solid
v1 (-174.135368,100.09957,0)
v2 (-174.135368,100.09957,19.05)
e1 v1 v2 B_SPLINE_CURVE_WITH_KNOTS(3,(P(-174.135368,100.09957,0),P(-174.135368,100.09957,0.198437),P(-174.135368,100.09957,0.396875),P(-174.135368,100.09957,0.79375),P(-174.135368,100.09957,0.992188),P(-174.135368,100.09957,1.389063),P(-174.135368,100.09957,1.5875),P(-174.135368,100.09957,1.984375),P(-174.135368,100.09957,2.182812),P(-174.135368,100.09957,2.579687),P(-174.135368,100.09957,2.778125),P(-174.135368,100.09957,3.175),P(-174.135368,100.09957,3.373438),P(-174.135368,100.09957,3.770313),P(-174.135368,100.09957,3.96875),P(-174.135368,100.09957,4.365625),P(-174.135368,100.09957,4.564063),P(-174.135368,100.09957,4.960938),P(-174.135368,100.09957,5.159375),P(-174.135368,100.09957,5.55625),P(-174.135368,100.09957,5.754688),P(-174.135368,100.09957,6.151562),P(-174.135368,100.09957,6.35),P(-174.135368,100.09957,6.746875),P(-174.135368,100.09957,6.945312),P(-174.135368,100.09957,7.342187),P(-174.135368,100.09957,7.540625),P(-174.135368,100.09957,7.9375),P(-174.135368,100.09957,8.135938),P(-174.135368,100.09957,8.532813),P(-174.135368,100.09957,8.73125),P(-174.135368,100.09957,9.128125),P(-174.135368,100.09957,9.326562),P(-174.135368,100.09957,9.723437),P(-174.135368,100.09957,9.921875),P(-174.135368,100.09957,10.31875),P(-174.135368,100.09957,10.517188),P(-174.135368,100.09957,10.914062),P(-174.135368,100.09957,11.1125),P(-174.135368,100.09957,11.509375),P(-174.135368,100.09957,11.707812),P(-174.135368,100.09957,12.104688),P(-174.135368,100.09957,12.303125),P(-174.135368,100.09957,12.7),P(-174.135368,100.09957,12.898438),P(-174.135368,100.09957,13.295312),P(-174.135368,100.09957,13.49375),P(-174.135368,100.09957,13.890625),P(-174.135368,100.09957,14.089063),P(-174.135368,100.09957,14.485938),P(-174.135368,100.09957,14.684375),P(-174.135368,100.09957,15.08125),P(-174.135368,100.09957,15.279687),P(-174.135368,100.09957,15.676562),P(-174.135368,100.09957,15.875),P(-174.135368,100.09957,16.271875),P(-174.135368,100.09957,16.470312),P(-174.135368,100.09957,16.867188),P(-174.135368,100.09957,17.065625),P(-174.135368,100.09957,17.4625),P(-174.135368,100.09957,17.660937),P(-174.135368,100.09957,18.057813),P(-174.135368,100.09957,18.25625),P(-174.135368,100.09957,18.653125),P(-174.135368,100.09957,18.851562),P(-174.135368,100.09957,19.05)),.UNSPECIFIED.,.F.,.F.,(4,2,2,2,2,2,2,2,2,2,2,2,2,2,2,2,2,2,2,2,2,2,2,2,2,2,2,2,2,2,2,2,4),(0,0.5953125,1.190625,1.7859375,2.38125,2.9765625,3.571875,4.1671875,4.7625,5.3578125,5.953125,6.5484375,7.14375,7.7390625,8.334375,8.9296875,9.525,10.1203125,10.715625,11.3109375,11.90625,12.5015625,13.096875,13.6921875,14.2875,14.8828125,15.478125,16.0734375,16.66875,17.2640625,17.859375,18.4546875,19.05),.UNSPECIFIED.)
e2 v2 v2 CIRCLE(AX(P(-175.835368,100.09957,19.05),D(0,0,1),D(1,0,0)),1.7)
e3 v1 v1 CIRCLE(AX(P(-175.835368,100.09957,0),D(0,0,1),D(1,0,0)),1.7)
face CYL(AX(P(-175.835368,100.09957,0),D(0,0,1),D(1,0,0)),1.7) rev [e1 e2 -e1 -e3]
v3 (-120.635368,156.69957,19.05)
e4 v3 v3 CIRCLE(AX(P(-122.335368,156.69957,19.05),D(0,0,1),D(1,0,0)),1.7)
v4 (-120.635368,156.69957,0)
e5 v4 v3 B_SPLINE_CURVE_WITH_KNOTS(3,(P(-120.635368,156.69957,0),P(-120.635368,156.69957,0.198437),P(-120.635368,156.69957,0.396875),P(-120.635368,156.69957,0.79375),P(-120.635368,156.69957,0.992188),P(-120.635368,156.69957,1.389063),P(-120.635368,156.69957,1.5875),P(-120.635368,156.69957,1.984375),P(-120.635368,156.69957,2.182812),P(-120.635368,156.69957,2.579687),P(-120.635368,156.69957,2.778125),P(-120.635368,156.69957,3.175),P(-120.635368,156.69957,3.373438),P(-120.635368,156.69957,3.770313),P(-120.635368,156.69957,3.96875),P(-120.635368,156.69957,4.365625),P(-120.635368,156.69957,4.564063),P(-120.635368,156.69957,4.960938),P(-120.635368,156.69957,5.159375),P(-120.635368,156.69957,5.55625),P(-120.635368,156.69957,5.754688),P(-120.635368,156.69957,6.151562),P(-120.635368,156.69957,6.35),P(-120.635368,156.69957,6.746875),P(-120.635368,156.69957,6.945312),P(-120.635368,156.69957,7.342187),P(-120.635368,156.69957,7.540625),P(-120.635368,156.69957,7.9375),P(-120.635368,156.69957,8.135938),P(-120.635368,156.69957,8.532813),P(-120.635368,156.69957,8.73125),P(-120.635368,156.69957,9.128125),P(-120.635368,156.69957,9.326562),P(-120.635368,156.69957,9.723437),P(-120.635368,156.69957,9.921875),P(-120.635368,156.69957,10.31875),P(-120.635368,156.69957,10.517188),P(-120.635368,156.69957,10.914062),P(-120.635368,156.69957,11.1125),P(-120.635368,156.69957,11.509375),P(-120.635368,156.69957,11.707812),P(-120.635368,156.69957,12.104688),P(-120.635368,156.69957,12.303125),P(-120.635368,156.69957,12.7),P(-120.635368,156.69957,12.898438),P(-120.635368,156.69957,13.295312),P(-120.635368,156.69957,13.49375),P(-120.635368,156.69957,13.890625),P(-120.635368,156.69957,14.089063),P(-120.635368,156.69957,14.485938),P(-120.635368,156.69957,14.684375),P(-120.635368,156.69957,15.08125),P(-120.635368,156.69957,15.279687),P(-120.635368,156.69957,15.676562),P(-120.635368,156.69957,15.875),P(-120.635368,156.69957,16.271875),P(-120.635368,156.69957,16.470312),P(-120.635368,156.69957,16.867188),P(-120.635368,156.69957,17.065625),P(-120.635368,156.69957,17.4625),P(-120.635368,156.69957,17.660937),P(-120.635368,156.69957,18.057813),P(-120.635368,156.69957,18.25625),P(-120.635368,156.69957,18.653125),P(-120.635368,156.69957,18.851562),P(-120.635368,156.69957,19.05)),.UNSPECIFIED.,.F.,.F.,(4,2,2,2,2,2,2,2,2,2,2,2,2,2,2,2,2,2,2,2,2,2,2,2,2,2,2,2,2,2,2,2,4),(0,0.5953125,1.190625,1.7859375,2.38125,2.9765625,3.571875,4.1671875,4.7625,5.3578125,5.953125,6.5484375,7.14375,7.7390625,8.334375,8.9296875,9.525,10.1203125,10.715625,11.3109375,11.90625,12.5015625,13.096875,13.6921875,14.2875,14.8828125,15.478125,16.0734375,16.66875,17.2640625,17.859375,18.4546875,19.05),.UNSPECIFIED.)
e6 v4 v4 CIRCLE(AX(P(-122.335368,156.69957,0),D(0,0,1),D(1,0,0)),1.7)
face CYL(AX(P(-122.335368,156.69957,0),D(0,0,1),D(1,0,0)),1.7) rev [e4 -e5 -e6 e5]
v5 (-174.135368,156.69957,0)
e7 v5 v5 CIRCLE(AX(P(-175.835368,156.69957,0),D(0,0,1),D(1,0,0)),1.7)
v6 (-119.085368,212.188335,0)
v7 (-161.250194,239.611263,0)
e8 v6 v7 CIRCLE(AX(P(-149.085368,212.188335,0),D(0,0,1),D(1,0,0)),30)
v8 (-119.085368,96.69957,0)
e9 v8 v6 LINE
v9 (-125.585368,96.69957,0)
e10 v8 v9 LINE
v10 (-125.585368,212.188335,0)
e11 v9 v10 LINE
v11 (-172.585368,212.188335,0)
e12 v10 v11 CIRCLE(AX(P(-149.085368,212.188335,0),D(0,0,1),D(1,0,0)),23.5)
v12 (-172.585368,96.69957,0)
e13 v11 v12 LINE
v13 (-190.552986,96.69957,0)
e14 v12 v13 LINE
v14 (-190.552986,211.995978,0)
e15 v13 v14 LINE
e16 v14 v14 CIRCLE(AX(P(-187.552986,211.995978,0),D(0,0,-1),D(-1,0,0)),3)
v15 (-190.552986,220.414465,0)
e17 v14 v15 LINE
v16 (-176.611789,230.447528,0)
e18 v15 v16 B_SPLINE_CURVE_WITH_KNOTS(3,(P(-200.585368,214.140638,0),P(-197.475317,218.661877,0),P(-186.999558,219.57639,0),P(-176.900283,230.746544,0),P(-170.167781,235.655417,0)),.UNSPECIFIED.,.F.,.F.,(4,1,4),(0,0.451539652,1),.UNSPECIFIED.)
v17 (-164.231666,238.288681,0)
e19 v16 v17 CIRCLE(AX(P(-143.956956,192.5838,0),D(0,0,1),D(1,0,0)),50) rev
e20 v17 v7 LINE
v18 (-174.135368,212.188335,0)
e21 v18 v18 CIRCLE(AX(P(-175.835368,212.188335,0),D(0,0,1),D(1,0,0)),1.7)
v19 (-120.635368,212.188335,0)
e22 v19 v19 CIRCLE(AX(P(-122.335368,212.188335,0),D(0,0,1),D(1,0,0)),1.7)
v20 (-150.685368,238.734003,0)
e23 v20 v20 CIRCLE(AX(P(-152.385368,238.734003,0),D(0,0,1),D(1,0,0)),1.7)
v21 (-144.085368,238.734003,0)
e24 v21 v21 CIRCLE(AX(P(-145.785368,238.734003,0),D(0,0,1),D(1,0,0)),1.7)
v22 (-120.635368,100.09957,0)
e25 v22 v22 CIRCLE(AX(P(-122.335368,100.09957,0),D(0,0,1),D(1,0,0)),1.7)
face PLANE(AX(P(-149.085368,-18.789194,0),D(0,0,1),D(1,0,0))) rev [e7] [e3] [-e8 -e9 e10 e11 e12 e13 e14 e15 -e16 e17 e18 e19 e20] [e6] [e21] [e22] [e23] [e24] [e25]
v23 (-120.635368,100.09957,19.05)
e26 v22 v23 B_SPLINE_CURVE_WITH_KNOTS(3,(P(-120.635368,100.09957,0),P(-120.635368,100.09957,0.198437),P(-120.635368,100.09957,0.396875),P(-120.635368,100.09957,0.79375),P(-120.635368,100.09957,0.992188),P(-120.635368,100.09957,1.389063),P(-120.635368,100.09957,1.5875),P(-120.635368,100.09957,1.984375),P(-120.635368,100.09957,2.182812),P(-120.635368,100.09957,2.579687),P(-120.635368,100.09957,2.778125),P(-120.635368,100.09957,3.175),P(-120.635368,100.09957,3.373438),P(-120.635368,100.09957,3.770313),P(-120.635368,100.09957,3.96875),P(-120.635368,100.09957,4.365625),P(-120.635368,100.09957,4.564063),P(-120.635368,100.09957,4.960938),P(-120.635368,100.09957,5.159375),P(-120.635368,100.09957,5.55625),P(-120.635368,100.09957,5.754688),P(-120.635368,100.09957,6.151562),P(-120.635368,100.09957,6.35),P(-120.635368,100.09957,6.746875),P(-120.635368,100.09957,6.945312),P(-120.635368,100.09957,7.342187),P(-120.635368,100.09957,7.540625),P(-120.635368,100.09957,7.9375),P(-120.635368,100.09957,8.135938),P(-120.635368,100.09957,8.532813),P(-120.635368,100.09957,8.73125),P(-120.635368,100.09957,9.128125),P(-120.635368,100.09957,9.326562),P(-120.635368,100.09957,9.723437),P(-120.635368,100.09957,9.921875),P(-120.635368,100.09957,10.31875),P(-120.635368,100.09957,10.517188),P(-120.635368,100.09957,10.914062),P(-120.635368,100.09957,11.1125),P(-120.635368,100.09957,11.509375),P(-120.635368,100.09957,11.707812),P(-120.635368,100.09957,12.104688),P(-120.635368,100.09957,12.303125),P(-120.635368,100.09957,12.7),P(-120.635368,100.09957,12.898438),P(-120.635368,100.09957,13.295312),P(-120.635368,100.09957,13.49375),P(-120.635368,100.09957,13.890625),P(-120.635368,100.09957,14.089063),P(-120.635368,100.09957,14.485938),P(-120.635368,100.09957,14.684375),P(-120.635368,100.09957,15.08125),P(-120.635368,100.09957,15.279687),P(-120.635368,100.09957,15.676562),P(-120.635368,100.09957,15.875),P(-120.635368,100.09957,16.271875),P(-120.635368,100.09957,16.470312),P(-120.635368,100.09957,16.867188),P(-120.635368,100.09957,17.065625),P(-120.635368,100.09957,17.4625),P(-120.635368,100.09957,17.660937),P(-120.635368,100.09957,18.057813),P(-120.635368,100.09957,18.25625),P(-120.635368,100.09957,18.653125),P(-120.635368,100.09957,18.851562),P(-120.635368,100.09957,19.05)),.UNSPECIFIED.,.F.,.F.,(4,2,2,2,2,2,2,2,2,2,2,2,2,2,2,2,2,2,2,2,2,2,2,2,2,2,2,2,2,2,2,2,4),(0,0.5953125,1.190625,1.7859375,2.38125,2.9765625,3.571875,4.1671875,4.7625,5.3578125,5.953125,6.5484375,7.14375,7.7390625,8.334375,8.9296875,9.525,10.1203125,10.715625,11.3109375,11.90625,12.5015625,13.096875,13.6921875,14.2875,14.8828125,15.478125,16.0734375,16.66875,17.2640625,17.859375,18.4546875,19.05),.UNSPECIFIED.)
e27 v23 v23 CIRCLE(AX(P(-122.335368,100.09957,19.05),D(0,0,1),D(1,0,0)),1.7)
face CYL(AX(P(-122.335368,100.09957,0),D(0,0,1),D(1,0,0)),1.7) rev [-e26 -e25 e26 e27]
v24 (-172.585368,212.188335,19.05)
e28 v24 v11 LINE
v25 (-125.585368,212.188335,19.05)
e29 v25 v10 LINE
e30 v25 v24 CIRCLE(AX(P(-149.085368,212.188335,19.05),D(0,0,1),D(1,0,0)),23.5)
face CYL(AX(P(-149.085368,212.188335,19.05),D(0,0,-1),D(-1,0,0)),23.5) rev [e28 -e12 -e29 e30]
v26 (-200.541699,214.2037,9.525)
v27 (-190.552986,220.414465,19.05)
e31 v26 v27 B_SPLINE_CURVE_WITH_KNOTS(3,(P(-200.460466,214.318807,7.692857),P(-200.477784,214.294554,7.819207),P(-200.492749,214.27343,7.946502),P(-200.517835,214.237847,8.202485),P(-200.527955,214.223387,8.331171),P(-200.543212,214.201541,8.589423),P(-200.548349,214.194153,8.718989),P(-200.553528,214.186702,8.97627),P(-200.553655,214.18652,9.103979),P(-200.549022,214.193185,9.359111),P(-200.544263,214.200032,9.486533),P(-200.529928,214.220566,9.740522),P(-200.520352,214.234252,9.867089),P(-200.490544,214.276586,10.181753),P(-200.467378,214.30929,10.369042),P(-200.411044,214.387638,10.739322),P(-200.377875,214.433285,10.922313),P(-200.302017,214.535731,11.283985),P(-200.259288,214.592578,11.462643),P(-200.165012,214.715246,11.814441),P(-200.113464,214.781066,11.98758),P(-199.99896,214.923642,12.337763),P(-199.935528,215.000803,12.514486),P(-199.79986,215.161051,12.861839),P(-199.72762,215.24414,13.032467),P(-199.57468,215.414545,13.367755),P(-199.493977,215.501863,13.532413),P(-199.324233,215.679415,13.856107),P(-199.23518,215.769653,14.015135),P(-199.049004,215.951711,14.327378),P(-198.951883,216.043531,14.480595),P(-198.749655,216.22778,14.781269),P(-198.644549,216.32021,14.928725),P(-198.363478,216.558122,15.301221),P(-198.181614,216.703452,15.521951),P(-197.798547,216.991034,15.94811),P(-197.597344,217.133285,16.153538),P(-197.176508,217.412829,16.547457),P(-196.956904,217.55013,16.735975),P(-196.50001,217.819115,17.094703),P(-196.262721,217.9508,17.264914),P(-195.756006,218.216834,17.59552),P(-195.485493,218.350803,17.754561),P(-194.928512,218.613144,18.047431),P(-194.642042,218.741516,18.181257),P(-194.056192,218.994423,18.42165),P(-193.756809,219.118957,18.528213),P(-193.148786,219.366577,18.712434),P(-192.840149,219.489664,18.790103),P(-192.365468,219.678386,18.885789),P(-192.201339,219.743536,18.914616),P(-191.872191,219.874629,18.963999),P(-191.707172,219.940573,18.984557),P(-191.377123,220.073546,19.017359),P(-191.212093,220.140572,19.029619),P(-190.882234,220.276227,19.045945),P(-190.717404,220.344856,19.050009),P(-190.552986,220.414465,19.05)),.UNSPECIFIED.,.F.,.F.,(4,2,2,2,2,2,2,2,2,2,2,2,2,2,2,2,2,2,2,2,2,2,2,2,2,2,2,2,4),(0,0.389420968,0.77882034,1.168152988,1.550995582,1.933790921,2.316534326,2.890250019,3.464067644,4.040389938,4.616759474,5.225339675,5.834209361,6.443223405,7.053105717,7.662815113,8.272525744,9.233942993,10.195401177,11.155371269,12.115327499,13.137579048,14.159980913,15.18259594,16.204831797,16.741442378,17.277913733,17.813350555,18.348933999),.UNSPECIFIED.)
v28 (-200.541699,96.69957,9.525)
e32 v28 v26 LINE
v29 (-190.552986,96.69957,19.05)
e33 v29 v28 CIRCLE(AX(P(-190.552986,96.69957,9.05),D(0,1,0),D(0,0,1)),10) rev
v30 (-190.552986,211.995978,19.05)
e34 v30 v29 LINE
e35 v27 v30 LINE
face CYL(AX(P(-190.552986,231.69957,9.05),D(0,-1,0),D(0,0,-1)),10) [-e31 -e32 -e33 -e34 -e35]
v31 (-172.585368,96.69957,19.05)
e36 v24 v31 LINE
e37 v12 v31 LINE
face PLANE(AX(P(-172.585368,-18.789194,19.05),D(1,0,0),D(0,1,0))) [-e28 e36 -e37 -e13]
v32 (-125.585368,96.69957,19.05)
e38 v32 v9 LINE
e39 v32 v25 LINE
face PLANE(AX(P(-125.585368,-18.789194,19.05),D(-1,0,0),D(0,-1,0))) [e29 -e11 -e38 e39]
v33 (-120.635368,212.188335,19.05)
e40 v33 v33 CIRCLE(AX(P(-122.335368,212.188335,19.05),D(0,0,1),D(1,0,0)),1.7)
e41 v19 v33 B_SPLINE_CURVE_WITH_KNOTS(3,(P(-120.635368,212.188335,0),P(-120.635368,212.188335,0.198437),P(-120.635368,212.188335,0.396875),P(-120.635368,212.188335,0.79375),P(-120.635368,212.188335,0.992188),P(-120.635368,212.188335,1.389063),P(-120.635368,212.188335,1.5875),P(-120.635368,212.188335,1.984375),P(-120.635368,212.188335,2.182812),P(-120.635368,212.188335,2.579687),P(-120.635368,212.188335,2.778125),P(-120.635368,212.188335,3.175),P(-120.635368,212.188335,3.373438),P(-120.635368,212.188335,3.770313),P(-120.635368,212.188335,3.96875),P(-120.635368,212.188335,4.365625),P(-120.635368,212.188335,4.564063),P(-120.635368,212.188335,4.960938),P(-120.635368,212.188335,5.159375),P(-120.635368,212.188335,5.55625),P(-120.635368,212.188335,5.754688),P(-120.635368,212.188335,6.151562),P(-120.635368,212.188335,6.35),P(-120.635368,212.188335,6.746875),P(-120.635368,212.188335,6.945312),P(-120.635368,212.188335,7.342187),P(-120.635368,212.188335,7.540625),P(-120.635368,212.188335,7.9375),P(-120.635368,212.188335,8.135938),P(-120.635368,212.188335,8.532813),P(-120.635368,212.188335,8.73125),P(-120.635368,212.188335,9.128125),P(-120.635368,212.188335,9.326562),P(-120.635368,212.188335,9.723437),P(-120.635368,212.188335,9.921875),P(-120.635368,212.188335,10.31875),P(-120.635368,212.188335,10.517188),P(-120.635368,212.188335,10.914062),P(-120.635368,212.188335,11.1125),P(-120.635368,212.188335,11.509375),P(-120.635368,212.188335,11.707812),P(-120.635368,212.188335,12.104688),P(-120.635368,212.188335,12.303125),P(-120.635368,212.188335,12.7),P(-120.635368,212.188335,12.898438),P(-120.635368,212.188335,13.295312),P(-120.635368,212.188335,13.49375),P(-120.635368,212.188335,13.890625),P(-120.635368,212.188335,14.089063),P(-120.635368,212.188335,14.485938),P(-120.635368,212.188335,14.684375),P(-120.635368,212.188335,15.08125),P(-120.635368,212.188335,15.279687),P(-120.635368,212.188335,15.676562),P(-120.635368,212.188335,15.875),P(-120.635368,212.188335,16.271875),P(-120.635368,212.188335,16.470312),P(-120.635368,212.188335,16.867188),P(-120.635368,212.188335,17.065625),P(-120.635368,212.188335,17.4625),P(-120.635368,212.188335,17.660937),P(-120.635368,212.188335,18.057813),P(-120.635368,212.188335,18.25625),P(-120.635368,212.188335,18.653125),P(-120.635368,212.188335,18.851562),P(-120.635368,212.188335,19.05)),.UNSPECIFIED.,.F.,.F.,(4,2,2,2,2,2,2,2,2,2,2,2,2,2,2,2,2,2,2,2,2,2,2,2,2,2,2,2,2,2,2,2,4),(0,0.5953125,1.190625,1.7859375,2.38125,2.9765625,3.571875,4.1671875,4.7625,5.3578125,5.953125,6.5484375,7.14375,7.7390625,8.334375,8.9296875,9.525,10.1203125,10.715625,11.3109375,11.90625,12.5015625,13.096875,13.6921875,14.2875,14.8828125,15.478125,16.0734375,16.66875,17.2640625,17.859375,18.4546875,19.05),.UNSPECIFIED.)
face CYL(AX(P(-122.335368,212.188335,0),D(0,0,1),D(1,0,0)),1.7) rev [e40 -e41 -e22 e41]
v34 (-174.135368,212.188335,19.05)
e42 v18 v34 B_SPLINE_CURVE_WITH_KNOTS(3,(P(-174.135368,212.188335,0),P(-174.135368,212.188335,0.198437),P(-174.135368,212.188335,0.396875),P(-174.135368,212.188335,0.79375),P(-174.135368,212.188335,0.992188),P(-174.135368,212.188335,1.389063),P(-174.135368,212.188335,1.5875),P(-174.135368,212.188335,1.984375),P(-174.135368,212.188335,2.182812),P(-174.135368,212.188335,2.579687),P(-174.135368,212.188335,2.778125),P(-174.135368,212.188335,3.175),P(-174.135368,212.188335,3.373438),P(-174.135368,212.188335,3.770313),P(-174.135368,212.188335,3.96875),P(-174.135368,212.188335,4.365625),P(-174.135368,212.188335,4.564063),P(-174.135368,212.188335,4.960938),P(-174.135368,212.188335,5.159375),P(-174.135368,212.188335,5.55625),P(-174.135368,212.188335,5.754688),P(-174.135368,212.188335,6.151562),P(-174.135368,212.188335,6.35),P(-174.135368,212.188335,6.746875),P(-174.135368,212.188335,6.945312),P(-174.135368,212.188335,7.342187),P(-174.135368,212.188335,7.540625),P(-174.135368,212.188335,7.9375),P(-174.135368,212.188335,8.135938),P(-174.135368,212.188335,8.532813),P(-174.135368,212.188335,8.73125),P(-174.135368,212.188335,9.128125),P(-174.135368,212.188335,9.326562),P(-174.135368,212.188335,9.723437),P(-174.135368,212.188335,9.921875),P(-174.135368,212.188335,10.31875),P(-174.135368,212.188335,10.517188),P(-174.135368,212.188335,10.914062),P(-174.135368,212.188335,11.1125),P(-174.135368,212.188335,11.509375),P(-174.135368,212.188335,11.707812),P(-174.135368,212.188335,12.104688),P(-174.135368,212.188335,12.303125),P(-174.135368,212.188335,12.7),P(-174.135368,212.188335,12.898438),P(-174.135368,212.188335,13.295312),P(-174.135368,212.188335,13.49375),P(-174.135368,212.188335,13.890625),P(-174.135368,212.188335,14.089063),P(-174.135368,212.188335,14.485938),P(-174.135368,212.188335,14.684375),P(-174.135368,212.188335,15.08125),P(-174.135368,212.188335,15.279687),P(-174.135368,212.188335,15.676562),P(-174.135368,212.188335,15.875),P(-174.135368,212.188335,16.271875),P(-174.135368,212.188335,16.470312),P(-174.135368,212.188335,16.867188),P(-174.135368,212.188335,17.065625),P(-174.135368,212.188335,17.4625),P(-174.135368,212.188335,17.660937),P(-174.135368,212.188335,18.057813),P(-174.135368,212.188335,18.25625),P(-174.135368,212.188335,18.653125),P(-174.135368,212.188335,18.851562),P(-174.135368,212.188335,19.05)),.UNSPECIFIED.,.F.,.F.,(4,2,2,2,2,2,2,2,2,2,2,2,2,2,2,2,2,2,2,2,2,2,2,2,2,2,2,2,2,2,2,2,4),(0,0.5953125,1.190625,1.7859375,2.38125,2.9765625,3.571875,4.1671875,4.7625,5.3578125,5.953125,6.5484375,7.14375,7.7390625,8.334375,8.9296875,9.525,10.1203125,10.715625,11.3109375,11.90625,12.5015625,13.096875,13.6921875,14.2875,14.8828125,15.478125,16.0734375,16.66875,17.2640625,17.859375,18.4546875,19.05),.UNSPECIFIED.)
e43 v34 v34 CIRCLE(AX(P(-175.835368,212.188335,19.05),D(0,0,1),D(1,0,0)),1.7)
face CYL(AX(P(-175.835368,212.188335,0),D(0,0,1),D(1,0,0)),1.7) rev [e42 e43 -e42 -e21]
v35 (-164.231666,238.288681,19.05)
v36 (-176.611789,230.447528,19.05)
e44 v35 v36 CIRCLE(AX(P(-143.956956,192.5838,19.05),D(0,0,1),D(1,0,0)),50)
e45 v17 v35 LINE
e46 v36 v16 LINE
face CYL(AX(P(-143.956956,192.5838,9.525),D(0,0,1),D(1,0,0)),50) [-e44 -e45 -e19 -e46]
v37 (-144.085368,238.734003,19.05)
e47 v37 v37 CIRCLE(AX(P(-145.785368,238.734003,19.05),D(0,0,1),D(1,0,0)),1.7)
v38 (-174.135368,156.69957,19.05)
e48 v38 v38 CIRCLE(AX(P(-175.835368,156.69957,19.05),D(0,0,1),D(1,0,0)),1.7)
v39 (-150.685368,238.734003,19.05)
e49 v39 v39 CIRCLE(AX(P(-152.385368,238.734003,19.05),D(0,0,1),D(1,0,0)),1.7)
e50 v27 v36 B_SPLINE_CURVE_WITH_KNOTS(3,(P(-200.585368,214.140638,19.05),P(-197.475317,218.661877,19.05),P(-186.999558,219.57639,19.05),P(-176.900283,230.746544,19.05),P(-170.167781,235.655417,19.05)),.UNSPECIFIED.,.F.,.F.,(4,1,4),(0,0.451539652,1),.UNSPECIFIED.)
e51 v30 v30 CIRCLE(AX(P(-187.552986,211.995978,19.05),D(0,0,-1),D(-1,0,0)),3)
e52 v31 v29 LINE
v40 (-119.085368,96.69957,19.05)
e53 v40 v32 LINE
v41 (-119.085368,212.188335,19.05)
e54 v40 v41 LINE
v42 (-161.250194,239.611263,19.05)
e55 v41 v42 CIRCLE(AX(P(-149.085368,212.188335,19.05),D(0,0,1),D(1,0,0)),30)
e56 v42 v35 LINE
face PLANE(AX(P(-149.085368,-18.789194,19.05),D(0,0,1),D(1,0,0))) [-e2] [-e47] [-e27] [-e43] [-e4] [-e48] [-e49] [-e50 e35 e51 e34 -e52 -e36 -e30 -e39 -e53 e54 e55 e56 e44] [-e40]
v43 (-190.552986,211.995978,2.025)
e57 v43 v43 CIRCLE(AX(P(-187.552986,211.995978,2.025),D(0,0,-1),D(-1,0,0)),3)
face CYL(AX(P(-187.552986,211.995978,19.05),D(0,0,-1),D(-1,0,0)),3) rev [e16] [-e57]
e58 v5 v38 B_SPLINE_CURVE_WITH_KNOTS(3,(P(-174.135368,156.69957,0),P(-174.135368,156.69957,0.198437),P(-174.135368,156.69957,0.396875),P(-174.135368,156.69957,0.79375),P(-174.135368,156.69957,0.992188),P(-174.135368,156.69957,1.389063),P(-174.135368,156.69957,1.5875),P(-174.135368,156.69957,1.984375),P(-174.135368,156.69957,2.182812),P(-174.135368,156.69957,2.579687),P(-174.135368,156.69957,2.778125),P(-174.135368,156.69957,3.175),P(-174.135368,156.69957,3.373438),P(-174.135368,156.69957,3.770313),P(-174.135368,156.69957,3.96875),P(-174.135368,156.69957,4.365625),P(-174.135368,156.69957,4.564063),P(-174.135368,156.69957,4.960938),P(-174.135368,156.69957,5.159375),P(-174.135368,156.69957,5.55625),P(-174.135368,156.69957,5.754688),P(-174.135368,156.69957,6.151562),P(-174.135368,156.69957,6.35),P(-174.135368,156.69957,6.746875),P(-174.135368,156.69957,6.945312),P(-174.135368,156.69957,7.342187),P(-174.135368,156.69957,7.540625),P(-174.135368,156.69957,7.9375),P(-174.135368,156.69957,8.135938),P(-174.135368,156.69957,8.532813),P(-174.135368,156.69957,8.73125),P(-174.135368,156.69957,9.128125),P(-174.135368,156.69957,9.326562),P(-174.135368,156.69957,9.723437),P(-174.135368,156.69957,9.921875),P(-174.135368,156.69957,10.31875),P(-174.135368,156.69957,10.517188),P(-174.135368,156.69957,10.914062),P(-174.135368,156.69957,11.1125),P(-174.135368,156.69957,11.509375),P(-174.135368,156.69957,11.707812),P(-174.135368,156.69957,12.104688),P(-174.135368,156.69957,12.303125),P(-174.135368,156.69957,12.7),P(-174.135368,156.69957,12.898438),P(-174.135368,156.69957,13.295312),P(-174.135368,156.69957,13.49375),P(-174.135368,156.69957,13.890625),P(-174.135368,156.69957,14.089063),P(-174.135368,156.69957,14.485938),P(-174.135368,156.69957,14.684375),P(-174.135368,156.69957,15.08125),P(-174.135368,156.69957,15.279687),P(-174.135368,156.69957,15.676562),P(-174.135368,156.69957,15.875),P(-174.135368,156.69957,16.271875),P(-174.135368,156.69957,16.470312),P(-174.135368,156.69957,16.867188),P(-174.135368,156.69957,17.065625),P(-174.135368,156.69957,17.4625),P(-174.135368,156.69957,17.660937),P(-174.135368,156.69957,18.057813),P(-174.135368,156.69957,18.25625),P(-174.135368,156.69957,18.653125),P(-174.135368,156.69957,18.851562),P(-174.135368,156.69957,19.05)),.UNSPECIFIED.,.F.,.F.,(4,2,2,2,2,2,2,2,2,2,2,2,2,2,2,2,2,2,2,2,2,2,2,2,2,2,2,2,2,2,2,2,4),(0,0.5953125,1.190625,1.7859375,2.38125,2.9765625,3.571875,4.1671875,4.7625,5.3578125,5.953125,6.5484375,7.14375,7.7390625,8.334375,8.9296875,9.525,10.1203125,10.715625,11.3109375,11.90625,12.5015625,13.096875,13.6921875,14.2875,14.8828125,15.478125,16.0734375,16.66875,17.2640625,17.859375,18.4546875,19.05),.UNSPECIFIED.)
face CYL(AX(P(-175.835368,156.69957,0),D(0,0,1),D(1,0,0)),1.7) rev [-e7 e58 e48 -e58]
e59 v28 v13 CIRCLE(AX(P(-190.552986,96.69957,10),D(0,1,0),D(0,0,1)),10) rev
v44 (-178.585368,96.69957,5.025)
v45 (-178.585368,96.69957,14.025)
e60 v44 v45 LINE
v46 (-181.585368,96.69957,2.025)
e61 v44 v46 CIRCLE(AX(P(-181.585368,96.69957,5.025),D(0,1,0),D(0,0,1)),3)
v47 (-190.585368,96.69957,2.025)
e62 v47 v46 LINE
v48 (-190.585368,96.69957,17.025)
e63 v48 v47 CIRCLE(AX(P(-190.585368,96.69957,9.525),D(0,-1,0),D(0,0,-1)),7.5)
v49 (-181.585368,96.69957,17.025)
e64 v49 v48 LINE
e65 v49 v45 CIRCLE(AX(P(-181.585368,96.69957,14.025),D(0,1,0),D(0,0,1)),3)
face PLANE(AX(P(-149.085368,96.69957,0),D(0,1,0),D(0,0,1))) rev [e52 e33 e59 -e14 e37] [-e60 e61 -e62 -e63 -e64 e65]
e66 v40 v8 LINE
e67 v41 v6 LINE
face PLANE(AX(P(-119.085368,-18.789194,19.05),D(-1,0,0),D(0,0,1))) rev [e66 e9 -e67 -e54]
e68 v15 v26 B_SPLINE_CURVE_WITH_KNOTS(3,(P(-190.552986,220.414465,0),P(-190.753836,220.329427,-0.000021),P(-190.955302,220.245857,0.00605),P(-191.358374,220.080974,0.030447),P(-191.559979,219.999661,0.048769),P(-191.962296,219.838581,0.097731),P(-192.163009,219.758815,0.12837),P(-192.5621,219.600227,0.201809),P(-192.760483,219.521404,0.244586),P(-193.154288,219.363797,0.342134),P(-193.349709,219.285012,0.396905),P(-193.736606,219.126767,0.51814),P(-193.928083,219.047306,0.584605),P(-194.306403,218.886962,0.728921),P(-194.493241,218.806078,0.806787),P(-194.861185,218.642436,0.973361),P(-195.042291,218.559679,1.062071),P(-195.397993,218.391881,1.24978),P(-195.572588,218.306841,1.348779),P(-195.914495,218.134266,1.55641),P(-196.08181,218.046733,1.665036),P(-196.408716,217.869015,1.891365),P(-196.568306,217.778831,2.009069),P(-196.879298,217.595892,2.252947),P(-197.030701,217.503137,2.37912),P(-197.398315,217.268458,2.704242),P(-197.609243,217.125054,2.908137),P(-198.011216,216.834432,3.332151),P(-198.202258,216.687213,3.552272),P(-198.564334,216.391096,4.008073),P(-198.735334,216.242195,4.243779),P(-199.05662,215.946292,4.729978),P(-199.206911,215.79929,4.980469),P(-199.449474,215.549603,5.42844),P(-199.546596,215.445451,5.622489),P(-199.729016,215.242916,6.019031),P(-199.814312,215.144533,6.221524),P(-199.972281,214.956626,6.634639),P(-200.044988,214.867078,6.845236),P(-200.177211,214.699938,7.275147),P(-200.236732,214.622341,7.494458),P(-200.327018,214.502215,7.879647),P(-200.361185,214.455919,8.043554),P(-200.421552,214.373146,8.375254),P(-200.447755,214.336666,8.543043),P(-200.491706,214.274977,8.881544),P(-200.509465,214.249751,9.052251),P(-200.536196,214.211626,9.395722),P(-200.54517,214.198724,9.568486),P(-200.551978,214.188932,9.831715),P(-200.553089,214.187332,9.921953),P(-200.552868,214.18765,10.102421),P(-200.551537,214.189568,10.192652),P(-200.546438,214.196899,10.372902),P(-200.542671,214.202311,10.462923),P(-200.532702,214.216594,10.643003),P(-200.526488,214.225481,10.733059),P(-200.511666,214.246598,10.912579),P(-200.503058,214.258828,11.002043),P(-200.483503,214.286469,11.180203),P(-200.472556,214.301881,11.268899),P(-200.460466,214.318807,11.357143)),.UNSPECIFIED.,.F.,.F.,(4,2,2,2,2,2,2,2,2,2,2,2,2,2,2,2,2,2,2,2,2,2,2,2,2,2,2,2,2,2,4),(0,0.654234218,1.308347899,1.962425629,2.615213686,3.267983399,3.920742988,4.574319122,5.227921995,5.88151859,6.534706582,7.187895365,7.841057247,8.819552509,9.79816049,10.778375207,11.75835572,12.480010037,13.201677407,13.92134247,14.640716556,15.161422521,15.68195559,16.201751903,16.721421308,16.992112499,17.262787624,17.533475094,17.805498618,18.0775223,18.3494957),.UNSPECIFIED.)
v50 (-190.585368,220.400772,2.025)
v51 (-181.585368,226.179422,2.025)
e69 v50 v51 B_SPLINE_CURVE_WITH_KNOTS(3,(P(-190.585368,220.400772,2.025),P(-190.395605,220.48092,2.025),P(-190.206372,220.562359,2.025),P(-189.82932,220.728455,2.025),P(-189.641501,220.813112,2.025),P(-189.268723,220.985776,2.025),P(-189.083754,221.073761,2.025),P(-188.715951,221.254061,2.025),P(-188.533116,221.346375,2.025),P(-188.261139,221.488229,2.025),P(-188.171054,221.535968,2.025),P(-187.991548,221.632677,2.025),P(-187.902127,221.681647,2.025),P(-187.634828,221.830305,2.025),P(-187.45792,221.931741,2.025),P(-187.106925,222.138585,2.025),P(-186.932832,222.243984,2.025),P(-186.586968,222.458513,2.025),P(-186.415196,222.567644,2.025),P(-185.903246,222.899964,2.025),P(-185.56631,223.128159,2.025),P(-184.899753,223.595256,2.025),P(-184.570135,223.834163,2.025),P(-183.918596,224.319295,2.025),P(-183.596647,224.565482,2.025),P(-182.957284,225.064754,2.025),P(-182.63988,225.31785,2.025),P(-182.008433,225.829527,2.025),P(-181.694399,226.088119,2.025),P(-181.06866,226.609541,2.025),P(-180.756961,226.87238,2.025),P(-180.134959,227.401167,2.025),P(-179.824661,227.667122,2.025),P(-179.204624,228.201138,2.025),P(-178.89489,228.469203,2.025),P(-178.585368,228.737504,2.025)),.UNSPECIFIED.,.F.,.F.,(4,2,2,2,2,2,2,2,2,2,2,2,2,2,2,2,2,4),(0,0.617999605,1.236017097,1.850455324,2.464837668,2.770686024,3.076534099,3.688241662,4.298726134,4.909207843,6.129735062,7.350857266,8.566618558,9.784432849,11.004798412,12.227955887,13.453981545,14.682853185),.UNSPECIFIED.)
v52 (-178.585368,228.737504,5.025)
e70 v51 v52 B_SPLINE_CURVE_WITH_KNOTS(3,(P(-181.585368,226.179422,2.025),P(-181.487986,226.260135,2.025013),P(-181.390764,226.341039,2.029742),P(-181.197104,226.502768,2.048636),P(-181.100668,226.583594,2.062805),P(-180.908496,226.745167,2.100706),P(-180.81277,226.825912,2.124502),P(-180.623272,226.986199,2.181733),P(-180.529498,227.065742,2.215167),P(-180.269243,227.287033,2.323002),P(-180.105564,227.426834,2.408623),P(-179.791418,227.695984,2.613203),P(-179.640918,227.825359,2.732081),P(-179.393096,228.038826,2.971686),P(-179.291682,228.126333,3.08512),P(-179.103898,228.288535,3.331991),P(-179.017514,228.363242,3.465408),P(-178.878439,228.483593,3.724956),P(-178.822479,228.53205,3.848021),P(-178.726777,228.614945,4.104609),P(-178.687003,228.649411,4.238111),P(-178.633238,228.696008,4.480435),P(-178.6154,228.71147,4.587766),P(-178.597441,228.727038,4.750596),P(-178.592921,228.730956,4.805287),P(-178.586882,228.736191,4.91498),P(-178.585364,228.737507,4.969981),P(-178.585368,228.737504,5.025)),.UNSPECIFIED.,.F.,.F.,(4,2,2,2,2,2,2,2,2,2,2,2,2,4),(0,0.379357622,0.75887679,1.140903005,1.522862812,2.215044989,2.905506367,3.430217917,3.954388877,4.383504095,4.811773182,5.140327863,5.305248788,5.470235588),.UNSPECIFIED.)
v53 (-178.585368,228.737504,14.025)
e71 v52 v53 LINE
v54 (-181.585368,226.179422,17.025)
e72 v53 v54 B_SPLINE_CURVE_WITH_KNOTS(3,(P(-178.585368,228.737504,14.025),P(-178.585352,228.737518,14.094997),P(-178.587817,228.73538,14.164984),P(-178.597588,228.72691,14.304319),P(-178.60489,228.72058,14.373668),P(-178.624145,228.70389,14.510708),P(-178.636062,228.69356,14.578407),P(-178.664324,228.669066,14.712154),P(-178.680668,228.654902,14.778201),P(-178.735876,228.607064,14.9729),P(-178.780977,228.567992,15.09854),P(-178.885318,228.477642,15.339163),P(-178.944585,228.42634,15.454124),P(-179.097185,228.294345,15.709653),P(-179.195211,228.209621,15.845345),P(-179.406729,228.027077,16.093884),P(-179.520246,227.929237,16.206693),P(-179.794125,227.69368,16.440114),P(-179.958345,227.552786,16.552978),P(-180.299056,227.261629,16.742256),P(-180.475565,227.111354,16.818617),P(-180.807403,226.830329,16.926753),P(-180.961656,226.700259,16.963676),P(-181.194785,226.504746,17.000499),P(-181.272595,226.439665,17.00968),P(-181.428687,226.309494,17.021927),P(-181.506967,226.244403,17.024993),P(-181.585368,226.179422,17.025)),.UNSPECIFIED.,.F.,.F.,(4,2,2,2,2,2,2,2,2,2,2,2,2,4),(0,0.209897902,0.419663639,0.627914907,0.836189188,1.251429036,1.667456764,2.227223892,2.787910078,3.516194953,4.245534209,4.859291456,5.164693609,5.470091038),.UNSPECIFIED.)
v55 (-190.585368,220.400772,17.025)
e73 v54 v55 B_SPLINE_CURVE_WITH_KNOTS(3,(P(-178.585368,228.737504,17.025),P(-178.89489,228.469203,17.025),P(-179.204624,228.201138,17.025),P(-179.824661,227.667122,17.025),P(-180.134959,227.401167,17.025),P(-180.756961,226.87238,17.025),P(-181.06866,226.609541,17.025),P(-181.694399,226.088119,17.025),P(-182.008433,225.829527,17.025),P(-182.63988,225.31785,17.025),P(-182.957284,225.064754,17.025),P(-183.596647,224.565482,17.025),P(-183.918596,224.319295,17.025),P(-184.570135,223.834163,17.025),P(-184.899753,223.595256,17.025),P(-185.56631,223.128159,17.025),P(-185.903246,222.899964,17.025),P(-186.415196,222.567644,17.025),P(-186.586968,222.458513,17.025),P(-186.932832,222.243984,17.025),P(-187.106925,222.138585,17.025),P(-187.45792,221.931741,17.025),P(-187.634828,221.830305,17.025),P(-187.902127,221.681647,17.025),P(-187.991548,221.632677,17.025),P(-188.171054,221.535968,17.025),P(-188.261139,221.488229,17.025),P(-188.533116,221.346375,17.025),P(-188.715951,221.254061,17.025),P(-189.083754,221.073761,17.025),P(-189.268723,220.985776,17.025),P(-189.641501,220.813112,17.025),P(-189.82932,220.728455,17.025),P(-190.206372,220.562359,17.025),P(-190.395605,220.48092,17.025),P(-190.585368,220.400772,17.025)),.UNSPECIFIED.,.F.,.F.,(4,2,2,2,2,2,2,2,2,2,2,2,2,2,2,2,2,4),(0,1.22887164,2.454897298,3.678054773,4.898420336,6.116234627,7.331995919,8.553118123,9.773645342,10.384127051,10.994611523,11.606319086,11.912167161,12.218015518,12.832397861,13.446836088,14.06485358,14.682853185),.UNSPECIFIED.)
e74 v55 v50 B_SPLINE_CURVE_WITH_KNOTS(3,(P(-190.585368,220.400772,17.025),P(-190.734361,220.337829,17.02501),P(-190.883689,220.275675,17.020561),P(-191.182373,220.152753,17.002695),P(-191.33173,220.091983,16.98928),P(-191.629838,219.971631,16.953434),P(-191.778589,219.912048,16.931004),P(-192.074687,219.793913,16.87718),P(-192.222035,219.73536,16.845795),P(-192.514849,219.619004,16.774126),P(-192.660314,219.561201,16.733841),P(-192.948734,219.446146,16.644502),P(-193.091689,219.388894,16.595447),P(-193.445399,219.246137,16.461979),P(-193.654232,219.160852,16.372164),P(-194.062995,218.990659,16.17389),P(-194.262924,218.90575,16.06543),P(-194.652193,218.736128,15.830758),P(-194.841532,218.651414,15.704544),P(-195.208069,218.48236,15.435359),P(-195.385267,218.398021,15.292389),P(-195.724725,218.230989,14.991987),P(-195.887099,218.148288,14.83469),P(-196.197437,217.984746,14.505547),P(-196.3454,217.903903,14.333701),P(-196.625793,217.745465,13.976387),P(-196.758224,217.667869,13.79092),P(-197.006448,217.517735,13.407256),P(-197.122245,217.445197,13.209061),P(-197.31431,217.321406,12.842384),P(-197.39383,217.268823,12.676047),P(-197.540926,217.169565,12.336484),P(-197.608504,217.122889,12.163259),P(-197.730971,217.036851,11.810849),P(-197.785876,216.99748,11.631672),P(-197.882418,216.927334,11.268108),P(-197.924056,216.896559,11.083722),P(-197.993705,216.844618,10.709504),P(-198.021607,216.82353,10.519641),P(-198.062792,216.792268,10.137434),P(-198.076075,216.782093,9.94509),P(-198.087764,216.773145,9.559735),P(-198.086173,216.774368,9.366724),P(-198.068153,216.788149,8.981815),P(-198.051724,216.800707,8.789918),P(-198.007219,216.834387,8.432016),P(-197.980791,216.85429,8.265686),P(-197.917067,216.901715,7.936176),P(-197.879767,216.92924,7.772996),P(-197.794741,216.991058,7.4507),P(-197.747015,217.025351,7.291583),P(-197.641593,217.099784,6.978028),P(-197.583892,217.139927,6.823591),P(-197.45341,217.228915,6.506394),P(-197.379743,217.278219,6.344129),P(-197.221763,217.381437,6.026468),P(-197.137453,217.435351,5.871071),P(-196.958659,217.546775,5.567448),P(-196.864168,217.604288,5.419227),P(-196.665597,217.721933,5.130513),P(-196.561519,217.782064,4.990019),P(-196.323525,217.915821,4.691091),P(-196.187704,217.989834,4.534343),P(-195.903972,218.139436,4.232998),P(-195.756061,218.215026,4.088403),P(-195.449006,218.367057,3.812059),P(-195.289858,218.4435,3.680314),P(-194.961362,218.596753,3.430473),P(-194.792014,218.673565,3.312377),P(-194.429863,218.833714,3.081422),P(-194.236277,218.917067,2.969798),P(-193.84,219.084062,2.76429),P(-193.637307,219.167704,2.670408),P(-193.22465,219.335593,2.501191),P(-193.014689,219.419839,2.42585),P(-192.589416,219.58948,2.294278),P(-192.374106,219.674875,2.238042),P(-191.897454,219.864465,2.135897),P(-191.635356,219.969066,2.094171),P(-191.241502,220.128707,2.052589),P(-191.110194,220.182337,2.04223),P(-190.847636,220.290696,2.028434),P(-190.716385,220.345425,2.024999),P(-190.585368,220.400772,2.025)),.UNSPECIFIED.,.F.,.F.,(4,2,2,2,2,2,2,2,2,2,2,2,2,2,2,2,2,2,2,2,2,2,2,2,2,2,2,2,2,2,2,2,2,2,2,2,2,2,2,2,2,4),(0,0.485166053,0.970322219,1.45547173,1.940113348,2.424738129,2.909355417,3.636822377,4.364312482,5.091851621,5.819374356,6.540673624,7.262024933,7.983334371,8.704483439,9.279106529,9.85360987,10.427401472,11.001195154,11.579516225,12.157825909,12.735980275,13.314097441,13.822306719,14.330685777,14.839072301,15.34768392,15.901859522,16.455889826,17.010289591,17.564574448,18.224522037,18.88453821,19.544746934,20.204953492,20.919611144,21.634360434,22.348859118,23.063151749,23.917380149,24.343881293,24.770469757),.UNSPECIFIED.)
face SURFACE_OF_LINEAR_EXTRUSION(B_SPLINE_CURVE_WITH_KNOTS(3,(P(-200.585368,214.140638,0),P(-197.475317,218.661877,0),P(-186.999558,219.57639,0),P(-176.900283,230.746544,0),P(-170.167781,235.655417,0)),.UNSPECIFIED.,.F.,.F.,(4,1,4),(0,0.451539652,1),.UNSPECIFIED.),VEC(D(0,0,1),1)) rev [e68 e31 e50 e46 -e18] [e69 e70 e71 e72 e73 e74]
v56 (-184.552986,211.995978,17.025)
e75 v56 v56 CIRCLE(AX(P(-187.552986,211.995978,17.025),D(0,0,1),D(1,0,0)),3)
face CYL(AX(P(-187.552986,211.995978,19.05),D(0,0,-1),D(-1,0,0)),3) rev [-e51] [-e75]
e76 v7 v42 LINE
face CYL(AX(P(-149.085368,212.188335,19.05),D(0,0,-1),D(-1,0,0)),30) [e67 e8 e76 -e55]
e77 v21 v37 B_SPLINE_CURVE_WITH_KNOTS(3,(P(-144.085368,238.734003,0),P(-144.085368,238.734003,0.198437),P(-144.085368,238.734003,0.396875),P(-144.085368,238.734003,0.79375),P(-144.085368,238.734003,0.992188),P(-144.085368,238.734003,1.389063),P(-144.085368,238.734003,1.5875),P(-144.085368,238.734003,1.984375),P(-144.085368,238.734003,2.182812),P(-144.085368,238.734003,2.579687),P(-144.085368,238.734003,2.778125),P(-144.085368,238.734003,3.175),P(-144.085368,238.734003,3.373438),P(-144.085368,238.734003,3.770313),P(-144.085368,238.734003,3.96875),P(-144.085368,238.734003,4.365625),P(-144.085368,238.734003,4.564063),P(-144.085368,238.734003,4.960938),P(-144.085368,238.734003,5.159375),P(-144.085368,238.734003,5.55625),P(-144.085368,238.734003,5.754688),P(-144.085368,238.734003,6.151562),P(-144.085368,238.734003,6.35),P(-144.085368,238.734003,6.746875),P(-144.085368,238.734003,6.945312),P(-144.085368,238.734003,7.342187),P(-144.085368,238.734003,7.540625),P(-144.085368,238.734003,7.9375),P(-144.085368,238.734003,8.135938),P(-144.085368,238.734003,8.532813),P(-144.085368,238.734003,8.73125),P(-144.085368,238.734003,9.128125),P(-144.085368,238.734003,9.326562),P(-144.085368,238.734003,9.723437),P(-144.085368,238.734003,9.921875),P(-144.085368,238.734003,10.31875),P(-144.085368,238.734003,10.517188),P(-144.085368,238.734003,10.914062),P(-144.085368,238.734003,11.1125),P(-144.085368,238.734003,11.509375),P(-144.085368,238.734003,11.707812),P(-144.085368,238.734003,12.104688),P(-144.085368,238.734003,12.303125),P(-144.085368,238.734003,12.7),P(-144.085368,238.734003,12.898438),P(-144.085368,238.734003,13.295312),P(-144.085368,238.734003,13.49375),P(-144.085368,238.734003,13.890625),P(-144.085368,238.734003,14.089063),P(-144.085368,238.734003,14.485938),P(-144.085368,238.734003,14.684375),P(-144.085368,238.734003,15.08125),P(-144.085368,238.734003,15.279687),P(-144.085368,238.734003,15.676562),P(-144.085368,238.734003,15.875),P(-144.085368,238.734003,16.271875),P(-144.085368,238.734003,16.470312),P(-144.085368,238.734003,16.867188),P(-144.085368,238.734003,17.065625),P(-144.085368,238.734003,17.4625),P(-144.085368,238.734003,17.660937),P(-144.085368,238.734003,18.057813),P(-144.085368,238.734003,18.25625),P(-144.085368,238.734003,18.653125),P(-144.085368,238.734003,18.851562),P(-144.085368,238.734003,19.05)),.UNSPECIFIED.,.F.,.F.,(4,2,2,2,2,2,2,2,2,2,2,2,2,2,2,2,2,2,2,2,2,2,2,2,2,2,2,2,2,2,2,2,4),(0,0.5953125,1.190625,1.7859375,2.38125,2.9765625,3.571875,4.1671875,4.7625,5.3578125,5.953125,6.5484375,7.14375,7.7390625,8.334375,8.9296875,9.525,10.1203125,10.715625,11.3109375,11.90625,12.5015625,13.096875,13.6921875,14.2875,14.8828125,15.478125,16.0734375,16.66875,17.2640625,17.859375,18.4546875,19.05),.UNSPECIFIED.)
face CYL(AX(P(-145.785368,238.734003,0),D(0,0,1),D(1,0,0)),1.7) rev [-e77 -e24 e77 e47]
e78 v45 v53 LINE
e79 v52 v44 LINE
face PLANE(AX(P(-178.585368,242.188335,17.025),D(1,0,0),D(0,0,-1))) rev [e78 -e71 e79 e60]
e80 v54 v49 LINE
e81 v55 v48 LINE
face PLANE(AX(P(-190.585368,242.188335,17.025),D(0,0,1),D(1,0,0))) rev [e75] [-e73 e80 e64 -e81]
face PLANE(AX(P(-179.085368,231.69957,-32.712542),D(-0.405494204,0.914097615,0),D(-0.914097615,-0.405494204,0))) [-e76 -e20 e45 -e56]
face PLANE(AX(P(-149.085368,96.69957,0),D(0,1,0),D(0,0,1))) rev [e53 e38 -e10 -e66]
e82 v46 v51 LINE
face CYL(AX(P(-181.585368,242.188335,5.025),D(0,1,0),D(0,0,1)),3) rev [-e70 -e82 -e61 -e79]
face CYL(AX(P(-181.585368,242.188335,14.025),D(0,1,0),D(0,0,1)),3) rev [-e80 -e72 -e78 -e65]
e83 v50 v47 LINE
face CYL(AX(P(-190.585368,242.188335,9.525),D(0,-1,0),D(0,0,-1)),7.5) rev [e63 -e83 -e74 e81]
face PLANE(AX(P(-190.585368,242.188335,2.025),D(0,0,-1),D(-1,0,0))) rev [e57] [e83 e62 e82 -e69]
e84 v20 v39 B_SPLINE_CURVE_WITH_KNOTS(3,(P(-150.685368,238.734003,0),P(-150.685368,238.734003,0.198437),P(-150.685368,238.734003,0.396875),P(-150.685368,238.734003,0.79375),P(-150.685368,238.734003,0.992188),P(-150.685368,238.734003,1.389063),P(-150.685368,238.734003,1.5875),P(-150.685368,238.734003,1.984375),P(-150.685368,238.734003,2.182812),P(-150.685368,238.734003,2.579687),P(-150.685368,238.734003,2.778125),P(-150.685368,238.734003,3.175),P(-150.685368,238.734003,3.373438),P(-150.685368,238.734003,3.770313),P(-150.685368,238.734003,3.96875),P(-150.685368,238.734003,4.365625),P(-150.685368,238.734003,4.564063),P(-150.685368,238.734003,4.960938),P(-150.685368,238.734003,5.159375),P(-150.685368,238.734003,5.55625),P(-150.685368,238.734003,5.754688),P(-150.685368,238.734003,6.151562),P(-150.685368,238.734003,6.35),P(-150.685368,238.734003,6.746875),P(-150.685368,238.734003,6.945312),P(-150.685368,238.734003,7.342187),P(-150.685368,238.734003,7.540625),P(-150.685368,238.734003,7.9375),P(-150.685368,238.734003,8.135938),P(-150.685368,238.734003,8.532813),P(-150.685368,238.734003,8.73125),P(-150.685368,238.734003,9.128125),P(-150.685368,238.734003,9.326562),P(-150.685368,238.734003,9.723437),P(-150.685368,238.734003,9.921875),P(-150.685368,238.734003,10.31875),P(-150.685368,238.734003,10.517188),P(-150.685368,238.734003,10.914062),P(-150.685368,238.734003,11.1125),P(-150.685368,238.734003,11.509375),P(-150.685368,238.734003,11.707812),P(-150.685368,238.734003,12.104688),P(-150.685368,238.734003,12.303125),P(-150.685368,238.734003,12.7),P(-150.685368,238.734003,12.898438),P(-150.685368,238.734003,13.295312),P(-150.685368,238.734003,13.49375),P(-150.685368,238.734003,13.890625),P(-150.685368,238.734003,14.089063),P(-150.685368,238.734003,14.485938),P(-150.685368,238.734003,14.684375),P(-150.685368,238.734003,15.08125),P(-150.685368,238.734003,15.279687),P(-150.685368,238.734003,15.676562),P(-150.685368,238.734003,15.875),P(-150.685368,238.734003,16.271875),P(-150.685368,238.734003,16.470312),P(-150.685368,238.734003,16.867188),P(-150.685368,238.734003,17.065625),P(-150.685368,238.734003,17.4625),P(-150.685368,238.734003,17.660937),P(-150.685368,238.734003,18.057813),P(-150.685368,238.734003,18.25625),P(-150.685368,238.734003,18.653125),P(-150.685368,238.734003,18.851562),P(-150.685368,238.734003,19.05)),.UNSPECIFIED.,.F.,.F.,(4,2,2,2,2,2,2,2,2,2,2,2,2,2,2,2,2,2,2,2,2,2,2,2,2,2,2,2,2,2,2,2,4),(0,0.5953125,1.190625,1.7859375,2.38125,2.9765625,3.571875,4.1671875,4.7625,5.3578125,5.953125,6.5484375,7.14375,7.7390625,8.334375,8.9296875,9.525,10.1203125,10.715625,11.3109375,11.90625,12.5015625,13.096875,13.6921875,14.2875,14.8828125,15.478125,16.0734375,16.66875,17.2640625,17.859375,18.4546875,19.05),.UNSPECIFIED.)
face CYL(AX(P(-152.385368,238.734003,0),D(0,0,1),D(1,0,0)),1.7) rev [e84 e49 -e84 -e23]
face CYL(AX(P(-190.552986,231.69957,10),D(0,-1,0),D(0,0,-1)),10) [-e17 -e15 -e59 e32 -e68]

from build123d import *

# Parameters (mm, degrees)
BOSS_EXTRUDE1_DEPTH = 19.05
SKETCH2_R           = 1.7
CUT_EXTRUDE1_DEPTH  = 302.810637772
CUT_EXTRUDE2_DEPTH  = 302.810637772
BOSS_EXTRUDE2_DEPTH = 135
BOSS_EXTRUDE3_START = -19.05
BOSS_EXTRUDE3_DEPTH = 19.05
CUT_EXTRUDE4_DEPTH  = 316.043777756
CUT_EXTRUDE5_DEPTH  = 249.524391307
FILLET2_R           = 50
FILLET3_R           = 10
FILLET4_R           = 3
SKETCH8_R           = 3
CUT_EXTRUDE6_DEPTH  = 316.015975709


with BuildPart() as part:
    # Sketch1 → Boss-Extrude1 (new body)
    with BuildSketch(Plane.XY):
        with BuildLine():
            Line((-179.085368151, -18.789194183), (-179.085368151, 212.188334746))
            ThreePointArc((-179.085368151, 212.188334746), (-149.085368151, 242.188334746), (-119.085368151, 212.188334746))
            Line((-119.085368151, 212.188334746), (-119.085368151, -18.789194183))
            ThreePointArc((-119.085368151, -18.789194183), (-149.085368151, -48.789194183), (-179.085368151, -18.789194183))
        make_face()
        with BuildLine():
            Line((-172.585368151, -18.789194183), (-172.585368151, 212.188334746))
            ThreePointArc((-172.585368151, 212.188334746), (-149.085368151, 235.688334746), (-125.585368151, 212.188334746))
            Line((-125.585368151, 212.188334746), (-125.585368151, -18.789194183))
            ThreePointArc((-125.585368151, -18.789194183), (-149.085368151, -42.289194183), (-172.585368151, -18.789194183))
        make_face(mode=Mode.SUBTRACT)
    extrude(amount=BOSS_EXTRUDE1_DEPTH)

    # Sketch2 → Cut-Extrude1 (cut, through all)
    with BuildSketch(Plane.XY.offset(19.05)):
        with Locations((-145.785368151, 238.734002942)):
            Circle(SKETCH2_R)
        with Locations((-122.335368151, 212.188334746)):
            Circle(SKETCH2_R)
        with Locations((-152.485368151, -45.322239617)):
            Circle(SKETCH2_R)
        with Locations((-168.000474547, -37.70430058)):
            Circle(SKETCH2_R)
        with Locations((-175.835368151, -18.789194183)):
            Circle(SKETCH2_R)
        with Locations((-175.835368151, 212.188334746)):
            Circle(SKETCH2_R)
        with Locations((-145.685368151, -45.322239617)):
            Circle(SKETCH2_R)
        with Locations((-175.835368151, 100.099570281)):
            Circle(SKETCH2_R)
        with Locations((-175.835368151, 93.299570281)):
            Circle(SKETCH2_R)
        with Locations((-122.335368151, 100.099570281)):
            Circle(SKETCH2_R)
        with Locations((-122.335368151, 93.299570281)):
            Circle(SKETCH2_R)
        with Locations((-122.335368151, -18.789194183)):
            Circle(SKETCH2_R)
        with Locations((-130.170261754, -37.70430058)):
            Circle(SKETCH2_R)
        with Locations((-175.835368151, 156.699570281)):
            Circle(SKETCH2_R)
        with Locations((-122.335368151, 156.699570281)):
            Circle(SKETCH2_R)
        with Locations((-175.835368151, 66.699570281)):
            Circle(SKETCH2_R)
        with Locations((-122.335368151, 66.699570281)):
            Circle(SKETCH2_R)
        with Locations((-175.835368151, 36.699570281)):
            Circle(SKETCH2_R)
        with Locations((-122.335368151, 36.699570281)):
            Circle(SKETCH2_R)
        with Locations((-175.835368151, 6.699570281)):
            Circle(SKETCH2_R)
        with Locations((-122.335368151, 6.699570281)):
            Circle(SKETCH2_R)
        with Locations((-152.385368151, 238.734002942)):
            Circle(SKETCH2_R)
    extrude(amount=-CUT_EXTRUDE1_DEPTH, mode=Mode.SUBTRACT)

    # Sketch3 → Cut-Extrude2 (cut, through all)
    with BuildSketch(Plane.XY.offset(19.05)):
        Polygon((-149.085368151, 96.699570281), (-100.167336626, 96.699570281), (-100.167336626, -59.171887956), (-212.527814826, -59.171887956), (-212.527814826, 96.699570281), align=None)
    extrude(amount=-CUT_EXTRUDE2_DEPTH, mode=Mode.SUBTRACT)

    # Sketch4 → Boss-Extrude2 (add)
    with BuildSketch(Plane.XZ.offset(-96.699570281)):
        with BuildLine():
            Line((-179.085368151, 19.05), (-196.652205402, 19.05))
            ThreePointArc((-196.652205402, 19.05), (-200.585368151, 9.525), (-196.652205402, 0))
            Line((-196.652205402, 0), (-179.085368151, 0))
            Line((-179.085368151, 0), (-179.085368151, 19.05))
        make_face()
    extrude(amount=-BOSS_EXTRUDE2_DEPTH)

    # Sketch5 → Boss-Extrude3 (add)
    with BuildSketch(Plane.XY.offset(19.05).offset(BOSS_EXTRUDE3_START)):
        with BuildLine():
            Line((-179.085368151, 231.699570281), (-179.085368151, 212.188334746))
            ThreePointArc((-179.085368151, 212.188334746), (-174.234371945, 228.544605963), (-161.250194275, 239.611263206))
            Line((-161.250194275, 239.611263206), (-179.085368151, 231.699570281))
        make_face()
    extrude(amount=BOSS_EXTRUDE3_DEPTH)

    # Sketch6 → Cut-Extrude4 (cut, through all)
    with BuildSketch(Plane.XY.offset(19.05)):
        with BuildLine():
            Line((-170.167781213, 235.655416744), (-200.585368151, 235.655416744))
            Line((-200.585368151, 235.655416744), (-200.585368151, 214.140637656))
            add(Edge.make_bspline(
                [(-170.167781213, 235.655416744), (-176.900282948, 230.746544465), (-186.999558372, 219.576390382), (-197.475317375, 218.661877457), (-200.585368151, 214.140637656)],
                knots=[0, 0, 0, 0, 0.548460348, 1, 1, 1, 1], degree=3))
        make_face()
    extrude(amount=-CUT_EXTRUDE4_DEPTH, mode=Mode.SUBTRACT)

    # Sketch7 → Cut-Extrude5 (cut, through all)
    with BuildSketch(Plane.XZ.offset(-96.699570281)):
        with BuildLine():
            Line((-190.585368151, 17.025), (-178.585368151, 17.025))
            Line((-178.585368151, 17.025), (-178.585368151, 2.025))
            Line((-178.585368151, 2.025), (-190.585368151, 2.025))
            ThreePointArc((-190.585368151, 2.025), (-198.085368151, 9.525), (-190.585368151, 17.025))
        make_face()
    extrude(amount=-CUT_EXTRUDE5_DEPTH, mode=Mode.SUBTRACT)

    # Fillet2
    fillet2_edges = [part.edges().sort_by_distance(p)[0] for p in [
        (-170.167781213, 235.655416744, 9.525),
    ]]
    fillet(fillet2_edges, radius=FILLET2_R)

    # Fillet3
    # the kernel refuses this fillet: 10 mm, written as the material it takes off along each edge
    with BuildSketch(Plane(origin=(-196.652205402, 66.752998532, 0), x_dir=(1, 0, 0), z_dir=(0, 1, 0))) as fillet3_piece_1:
        with BuildLine():
            CenterArc((6.099219193, -10), FILLET3_R, 90, 97.799925588)
            ThreePointArc((-3.808260974, -11.357142857), (-3.23274377, -5.233062714), (0, 0))
            Line((0, 0), (6.099219193, 0))
        make_face()
    extrude(amount=180.922793438, mode=Mode.SUBTRACT)
    with BuildSketch(Plane(origin=(-196.652205402, 66.752998532, 19.05), x_dir=(-0.3179212804444137, 0, -0.9481171127242586), z_dir=(0, 1, 0))) as fillet3_piece_2:
        with BuildLine():
            CenterArc((7.542099552, -8.961986896), FILLET3_R, 63.66281519, 97.799925588)
            Line((-1.939071576, -5.782774091), (0, 0))
            ThreePointArc((0, 0), (5.98931435, 1.401317691), (11.9786287, 0))
        make_face()
    extrude(amount=180.922793438, mode=Mode.SUBTRACT)

    # Fillet4
    fillet4_edges = [part.edges().sort_by_distance(p)[0] for p in [
        (-178.585368151, 162.718537025, 17.025),
        (-178.585368151, 162.718537025, 2.025),
    ]]
    fillet(fillet4_edges, radius=FILLET4_R)

    # Sketch8 → Cut-Extrude6 (cut, through all)
    with BuildSketch(Plane(origin=(0, 0, 0), x_dir=(-1, 0, 0), z_dir=(0, 0, -1))):
        with Locations((187.552986209, 211.995977711)):
            Circle(SKETCH8_R)
    extrude(amount=-CUT_EXTRUDE6_DEPTH, mode=Mode.SUBTRACT)


solid = part.part
